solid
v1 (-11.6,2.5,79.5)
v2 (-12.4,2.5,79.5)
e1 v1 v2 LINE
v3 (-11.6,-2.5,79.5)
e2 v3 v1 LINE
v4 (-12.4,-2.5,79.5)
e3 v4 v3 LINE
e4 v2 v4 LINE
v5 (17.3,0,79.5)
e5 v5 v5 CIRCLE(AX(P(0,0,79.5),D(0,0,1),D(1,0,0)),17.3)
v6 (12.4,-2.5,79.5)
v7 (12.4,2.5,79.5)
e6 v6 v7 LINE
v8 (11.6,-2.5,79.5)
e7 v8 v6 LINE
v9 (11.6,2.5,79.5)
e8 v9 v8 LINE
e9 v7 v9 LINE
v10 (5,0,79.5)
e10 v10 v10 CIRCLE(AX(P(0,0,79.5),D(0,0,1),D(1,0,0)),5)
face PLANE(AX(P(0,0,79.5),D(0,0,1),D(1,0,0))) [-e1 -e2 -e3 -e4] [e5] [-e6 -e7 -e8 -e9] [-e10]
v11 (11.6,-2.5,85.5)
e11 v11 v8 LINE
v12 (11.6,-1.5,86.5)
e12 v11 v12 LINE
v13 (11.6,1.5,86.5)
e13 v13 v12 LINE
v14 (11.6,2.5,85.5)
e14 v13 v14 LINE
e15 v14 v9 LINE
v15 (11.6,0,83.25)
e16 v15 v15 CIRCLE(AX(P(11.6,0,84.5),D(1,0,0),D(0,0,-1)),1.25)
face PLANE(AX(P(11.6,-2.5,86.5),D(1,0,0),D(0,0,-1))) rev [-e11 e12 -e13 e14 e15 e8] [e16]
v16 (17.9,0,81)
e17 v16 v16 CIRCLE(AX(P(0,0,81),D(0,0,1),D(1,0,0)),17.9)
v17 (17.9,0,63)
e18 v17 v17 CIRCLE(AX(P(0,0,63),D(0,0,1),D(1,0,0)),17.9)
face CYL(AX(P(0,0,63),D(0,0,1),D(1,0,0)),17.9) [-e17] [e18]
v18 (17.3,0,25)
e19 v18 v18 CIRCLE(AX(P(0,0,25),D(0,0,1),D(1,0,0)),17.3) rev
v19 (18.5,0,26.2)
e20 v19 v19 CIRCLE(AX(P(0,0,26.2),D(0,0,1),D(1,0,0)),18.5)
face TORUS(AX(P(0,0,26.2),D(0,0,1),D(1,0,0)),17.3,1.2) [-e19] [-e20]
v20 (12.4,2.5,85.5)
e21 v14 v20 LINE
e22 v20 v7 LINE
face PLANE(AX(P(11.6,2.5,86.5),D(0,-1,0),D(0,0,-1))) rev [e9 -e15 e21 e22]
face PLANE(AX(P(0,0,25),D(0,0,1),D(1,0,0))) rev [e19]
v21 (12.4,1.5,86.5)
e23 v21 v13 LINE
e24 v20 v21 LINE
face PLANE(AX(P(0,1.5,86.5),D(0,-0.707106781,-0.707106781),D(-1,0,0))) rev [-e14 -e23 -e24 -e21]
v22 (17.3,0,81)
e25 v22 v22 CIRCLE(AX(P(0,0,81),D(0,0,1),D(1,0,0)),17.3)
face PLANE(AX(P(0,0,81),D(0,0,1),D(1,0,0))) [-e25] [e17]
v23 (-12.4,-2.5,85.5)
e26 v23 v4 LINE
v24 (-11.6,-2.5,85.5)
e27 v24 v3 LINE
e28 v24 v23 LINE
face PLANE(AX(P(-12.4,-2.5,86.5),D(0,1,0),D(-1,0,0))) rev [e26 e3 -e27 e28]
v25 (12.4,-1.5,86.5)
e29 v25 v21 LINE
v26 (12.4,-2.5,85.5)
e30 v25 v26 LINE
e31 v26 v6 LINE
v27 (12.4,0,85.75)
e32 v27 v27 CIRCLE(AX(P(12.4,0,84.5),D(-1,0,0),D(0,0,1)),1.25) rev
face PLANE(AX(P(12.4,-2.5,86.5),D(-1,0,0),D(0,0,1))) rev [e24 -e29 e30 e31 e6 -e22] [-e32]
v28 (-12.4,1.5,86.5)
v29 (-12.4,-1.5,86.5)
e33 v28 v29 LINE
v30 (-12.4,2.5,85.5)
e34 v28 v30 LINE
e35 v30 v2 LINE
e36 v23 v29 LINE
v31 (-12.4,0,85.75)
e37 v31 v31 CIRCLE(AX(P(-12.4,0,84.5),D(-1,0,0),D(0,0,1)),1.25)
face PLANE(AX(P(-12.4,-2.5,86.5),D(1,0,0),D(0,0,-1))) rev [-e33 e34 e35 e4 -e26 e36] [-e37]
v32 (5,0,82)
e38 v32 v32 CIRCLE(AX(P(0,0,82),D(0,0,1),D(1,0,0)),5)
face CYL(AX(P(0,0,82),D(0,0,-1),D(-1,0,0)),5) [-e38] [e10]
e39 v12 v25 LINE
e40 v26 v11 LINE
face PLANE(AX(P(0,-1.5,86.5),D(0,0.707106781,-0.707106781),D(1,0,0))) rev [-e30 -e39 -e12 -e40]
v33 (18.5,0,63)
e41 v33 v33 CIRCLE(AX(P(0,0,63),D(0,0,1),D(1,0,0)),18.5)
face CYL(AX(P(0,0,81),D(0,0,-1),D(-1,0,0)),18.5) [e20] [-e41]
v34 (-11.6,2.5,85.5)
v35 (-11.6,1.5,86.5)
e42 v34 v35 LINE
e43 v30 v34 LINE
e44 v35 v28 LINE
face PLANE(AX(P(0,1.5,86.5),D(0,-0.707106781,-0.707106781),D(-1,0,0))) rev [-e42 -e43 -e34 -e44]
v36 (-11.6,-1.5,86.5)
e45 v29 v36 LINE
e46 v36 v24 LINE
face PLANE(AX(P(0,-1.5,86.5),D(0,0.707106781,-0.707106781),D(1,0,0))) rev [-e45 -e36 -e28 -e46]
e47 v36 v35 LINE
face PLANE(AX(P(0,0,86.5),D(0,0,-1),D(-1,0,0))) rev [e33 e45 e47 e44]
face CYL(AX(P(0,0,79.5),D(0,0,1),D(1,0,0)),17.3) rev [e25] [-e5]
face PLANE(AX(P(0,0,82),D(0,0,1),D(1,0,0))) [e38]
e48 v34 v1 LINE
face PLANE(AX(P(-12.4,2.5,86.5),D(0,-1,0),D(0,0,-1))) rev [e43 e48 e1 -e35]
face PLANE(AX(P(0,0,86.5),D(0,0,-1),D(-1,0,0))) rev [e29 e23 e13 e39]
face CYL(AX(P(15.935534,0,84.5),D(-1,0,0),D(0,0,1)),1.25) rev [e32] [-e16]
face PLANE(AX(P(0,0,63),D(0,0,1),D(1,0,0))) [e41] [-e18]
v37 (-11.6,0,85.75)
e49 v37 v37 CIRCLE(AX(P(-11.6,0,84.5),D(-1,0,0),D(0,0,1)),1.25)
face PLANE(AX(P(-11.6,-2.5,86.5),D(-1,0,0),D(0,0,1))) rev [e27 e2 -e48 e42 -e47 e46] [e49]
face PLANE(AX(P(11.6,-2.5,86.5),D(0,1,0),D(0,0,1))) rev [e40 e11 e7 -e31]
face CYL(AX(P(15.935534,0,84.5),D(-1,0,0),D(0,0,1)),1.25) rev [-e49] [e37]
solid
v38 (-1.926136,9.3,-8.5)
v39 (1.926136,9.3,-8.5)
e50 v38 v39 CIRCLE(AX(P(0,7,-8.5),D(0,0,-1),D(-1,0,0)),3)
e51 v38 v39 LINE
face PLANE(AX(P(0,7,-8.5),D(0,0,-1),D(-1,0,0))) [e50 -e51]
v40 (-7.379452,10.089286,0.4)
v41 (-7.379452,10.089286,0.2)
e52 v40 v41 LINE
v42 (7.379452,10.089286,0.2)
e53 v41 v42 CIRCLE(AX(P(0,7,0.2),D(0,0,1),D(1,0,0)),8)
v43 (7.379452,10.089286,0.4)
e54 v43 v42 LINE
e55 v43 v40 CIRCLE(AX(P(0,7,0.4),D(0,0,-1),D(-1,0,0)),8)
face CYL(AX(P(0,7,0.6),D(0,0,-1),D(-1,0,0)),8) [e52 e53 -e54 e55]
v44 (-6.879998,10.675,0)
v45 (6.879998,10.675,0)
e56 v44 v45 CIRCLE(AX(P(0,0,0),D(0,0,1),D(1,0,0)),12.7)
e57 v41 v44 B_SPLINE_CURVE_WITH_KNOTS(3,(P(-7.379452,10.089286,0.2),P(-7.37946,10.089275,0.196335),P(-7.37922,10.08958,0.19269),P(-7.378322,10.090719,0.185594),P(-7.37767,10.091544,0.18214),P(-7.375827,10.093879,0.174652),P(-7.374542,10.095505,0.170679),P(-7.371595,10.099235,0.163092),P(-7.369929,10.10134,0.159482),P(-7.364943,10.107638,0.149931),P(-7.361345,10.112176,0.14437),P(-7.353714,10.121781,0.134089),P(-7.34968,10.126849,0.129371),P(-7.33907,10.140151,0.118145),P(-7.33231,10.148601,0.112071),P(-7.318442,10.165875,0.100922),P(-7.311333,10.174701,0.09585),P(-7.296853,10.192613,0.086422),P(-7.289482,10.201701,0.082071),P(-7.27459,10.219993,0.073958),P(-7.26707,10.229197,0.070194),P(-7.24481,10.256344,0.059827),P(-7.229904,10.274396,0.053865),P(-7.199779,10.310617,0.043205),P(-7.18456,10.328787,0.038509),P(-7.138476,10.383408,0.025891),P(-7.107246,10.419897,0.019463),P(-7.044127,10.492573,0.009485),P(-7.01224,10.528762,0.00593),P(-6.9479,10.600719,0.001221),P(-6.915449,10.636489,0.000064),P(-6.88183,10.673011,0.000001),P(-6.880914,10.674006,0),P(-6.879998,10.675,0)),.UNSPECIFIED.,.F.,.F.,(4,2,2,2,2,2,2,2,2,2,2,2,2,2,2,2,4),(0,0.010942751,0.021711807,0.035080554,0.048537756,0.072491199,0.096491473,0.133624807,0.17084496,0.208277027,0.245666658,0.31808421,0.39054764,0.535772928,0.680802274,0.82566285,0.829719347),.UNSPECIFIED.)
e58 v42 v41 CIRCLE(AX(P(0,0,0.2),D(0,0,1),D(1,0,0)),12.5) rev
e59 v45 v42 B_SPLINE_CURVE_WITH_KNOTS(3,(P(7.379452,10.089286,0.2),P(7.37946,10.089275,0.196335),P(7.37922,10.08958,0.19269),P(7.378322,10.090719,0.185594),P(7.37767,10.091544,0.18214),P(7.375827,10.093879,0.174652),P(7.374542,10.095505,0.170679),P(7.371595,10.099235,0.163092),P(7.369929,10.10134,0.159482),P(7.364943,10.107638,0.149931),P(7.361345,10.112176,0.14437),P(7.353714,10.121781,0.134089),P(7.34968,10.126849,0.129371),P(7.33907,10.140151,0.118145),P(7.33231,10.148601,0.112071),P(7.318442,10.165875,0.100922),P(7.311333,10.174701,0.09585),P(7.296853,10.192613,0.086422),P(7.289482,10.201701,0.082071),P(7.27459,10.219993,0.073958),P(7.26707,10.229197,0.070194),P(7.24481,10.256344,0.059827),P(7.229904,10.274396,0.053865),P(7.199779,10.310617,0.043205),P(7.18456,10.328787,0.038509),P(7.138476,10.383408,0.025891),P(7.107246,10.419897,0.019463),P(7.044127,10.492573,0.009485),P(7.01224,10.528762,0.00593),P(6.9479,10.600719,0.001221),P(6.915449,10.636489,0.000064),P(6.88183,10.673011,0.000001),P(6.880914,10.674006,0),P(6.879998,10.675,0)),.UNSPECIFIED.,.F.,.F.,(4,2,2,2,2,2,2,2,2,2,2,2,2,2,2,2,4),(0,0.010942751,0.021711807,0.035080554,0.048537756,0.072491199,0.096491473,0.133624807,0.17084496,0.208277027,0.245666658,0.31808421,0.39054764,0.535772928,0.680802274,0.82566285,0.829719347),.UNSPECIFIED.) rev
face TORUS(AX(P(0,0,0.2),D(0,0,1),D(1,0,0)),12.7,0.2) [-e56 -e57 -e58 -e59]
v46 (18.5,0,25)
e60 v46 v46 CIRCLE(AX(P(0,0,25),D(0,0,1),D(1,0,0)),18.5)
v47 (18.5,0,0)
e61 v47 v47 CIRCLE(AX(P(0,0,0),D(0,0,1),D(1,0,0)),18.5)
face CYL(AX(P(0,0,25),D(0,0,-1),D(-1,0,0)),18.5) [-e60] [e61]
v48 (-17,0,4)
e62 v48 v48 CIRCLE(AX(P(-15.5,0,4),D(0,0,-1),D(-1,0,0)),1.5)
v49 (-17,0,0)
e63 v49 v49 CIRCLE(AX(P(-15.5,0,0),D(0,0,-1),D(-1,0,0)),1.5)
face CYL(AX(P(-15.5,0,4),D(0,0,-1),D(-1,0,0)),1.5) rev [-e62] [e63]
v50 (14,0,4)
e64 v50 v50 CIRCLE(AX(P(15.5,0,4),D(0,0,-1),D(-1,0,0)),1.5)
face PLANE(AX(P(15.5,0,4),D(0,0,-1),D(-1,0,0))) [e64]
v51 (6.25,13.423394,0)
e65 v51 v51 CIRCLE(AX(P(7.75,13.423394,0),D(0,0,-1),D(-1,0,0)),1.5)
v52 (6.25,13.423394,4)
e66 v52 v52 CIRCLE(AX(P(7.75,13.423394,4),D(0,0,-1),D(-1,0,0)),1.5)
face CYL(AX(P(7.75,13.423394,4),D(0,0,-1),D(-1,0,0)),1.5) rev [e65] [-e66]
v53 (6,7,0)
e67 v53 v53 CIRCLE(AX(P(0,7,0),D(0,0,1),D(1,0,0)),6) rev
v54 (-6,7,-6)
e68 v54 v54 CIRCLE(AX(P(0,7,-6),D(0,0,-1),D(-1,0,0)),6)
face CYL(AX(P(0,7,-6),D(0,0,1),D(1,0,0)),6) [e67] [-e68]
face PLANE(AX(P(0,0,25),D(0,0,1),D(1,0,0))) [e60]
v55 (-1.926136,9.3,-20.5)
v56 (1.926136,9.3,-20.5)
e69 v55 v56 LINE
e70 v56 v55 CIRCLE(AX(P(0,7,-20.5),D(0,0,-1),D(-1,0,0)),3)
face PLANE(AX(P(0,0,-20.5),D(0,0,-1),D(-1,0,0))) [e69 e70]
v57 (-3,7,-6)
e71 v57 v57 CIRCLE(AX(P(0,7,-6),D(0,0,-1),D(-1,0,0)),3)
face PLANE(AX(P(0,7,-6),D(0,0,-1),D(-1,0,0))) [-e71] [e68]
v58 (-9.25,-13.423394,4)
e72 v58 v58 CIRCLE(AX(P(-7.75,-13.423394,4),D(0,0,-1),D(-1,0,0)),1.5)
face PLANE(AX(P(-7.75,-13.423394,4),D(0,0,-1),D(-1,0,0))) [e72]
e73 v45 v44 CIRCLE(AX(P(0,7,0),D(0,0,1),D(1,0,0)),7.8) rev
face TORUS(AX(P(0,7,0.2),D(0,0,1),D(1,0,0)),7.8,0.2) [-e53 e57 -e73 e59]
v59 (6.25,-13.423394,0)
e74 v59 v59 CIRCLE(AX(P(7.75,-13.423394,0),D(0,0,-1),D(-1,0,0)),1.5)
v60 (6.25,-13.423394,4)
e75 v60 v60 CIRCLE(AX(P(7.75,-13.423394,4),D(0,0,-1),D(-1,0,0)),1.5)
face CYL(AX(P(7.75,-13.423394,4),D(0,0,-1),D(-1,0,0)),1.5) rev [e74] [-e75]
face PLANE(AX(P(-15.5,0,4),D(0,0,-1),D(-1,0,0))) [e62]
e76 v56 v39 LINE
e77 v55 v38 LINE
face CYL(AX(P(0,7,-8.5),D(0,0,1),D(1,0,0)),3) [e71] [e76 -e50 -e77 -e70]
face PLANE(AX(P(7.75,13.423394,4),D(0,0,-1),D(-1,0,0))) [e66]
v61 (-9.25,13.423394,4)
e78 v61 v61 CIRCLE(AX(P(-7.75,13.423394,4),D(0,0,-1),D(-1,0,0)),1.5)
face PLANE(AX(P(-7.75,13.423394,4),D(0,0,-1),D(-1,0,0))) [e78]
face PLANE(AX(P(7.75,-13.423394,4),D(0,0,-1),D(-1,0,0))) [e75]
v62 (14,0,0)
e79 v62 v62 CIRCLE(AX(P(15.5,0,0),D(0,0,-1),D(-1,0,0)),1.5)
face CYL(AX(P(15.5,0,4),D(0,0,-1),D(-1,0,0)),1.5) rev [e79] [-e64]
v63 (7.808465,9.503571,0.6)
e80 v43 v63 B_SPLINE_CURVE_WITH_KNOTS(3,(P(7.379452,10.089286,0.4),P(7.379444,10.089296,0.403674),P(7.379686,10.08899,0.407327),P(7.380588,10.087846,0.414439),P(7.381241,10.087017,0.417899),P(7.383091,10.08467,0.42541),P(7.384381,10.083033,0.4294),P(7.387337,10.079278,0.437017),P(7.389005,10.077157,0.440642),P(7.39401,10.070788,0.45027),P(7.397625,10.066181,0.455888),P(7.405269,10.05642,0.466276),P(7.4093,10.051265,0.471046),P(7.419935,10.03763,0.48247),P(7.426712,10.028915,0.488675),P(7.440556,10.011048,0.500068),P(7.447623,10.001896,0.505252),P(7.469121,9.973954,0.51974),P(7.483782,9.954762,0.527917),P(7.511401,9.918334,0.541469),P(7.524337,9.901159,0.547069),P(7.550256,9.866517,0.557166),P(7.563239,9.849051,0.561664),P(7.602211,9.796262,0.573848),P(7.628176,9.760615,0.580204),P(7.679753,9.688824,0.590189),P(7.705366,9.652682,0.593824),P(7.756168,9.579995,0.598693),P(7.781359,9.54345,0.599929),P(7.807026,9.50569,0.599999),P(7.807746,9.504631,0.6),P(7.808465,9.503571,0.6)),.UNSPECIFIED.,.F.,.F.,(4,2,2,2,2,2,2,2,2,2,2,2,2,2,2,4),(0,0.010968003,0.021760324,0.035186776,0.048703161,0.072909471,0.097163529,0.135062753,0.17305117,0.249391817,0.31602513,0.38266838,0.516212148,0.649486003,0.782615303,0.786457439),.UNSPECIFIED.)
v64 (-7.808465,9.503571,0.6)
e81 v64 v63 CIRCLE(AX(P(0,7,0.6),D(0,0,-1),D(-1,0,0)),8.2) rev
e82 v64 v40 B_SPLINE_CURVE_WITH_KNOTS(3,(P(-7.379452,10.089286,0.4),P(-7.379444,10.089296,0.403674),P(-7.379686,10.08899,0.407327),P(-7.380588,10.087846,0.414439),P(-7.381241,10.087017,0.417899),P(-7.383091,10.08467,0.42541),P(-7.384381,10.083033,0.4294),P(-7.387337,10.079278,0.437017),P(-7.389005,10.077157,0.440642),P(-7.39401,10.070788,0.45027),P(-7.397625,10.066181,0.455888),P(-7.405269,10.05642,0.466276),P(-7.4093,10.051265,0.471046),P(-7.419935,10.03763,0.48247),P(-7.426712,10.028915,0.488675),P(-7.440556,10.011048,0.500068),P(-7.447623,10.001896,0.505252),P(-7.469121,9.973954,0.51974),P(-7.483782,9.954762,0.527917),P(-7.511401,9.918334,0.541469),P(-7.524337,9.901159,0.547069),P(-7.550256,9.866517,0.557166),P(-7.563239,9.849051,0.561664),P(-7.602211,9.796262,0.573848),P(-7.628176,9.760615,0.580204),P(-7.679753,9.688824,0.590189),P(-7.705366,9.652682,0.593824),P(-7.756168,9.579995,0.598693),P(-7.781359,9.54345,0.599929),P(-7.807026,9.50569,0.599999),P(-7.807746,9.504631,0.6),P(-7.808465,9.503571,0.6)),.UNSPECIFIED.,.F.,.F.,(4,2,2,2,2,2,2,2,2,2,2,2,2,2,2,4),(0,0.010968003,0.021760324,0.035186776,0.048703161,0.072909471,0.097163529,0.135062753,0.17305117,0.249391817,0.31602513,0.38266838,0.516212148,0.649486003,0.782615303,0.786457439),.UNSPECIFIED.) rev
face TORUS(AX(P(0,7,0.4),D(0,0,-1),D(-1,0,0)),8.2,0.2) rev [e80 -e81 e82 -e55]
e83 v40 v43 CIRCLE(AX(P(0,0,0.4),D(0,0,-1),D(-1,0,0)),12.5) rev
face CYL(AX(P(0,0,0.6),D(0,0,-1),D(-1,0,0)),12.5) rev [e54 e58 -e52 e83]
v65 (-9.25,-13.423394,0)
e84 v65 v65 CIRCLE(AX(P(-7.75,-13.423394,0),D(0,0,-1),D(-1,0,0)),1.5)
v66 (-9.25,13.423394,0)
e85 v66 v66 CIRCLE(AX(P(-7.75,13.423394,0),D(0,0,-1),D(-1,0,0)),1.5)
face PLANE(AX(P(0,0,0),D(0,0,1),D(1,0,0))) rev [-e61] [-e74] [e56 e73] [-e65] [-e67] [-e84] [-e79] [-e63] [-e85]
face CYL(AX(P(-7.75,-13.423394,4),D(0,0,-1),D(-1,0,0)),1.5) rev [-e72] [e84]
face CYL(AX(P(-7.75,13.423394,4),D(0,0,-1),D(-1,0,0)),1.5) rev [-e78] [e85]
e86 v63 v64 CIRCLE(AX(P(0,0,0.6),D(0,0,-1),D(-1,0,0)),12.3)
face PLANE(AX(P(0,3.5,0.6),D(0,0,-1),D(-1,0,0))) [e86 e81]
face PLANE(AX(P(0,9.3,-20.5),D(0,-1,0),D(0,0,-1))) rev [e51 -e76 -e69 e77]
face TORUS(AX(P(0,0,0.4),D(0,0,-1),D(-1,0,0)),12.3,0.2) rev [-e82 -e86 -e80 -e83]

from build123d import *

# Parameters (mm, degrees)
SKETCH1_R           = 18.5
BOSS_EXTRUDE1_DEPTH = 25
SKETCH2_R           = 18.5
BOSS_EXTRUDE2_DEPTH = 56
FILLET1_R           = 1.2
CUT_EXTRUDE2_START  = -18
SKETCH3_R           = 18.5
SKETCH3_R_2         = 17.9
CUT_EXTRUDE2_DEPTH  = 18
SKETCH4_R           = 17.3
CUT_EXTRUDE3_DEPTH  = 1.5
SKETCH5_R           = 5
BOSS_EXTRUDE3_DEPTH = 2.5
SKETCH6_W           = 0.8
SKETCH6_H           = 5
BOSS_EXTRUDE4_DEPTH = 7
CUT_EXTRUDE4_REACH  = 95.698
SKETCH7_R           = 1.25
CHAMFER1_SIZE       = 1
SKETCH8_R           = 6
BOSS_EXTRUDE5_DEPTH = 6
SKETCH9_R           = 3
BOSS_EXTRUDE6_DEPTH = 2.5
BOSS_EXTRUDE7_DEPTH = 12
CUT_EXTRUDE5_DEPTH  = 0.6
FILLET2_R           = 0.2
SKETCH12_R          = 1.5
CUT_EXTRUDE6_DEPTH  = 4


with BuildPart() as part:
    # Sketch1 → Boss-Extrude1 (new body)
    with BuildSketch(Plane.XY):
        Circle(SKETCH1_R)
    extrude(amount=BOSS_EXTRUDE1_DEPTH)

    # Sketch8 → Boss-Extrude5 (add)
    with BuildSketch(Plane(origin=(0, 0, 0), x_dir=(-1, 0, 0), z_dir=(0, 0, -1))):
        with Locations(Location((0, 7, 0), (0, 0, 180))):
            Circle(SKETCH8_R)
    extrude(amount=BOSS_EXTRUDE5_DEPTH)

    # Sketch9 → Boss-Extrude6 (add)
    with BuildSketch(Plane(origin=(0, 0, -6), x_dir=(-1, 0, 0), z_dir=(0, 0, -1))):
        with Locations((0, 7)):
            Circle(SKETCH9_R)
    extrude(amount=BOSS_EXTRUDE6_DEPTH)

    # Sketch10 → Boss-Extrude7 (add)
    with BuildSketch(Plane(origin=(0, 0, -8.5), x_dir=(-1, 0, 0), z_dir=(0, 0, -1))):
        with BuildLine():
            ThreePointArc((3, 7), (2.718309041, 8.269171366), (1.926136028, 9.3))
            Line((1.926136028, 9.3), (-1.926136028, 9.3))
            ThreePointArc((-1.926136028, 9.3), (-1.269171366, 4.281690959), (3, 7))
        make_face()
    extrude(amount=BOSS_EXTRUDE7_DEPTH)

    # Sketch11 → Cut-Extrude5 (cut)
    with BuildSketch(Plane(origin=(0, 0, 0), x_dir=(-1, 0, 0), z_dir=(0, 0, -1))):
        with BuildLine():
            ThreePointArc((-7.379452132, 10.089285714), (0, -12.5), (7.379452132, 10.089285714))
            ThreePointArc((7.379452132, 10.089285714), (0, -1), (-7.379452132, 10.089285714))
        make_face()
    extrude(amount=-CUT_EXTRUDE5_DEPTH, mode=Mode.SUBTRACT)

    # Fillet2
    fillet2_edges = [part.edges().sort_by_distance(p)[0] for p in [
        (0, -12.5, 0),
        (0, -1, 0),
        (0, -12.5, 0.6),
        (0, -1, 0.6),
    ]]
    fillet(fillet2_edges, radius=FILLET2_R)

    # Sketch12 → Cut-Extrude6 (cut)
    with BuildSketch(Plane(origin=(0, 0, 0), x_dir=(-1, 0, 0), z_dir=(0, 0, -1))):
        with Locations((-15.5, 0)):
            Circle(SKETCH12_R)
        with Locations((-7.75, 13.423393759)):
            Circle(SKETCH12_R)
        with Locations((7.75, 13.423393759)):
            Circle(SKETCH12_R)
        with Locations((15.5, 0)):
            Circle(SKETCH12_R)
        with Locations((7.75, -13.423393759)):
            Circle(SKETCH12_R)
        with Locations((-7.75, -13.423393759)):
            Circle(SKETCH12_R)
    extrude(amount=-CUT_EXTRUDE6_DEPTH, mode=Mode.SUBTRACT)


with BuildPart() as body_2:
    # Sketch2 → Boss-Extrude2 (new body)
    with BuildSketch(Plane.XY.offset(25)):
        Circle(SKETCH2_R)
    extrude(amount=BOSS_EXTRUDE2_DEPTH)

    # Fillet1
    fillet1_edges = [body_2.edges().sort_by_distance(p)[0] for p in [
        (-18.5, 0, 25),
    ]]
    fillet(fillet1_edges, radius=FILLET1_R)

    # Sketch3 → Cut-Extrude2 (cut)
    with BuildSketch(Plane.XY.offset(81).offset(CUT_EXTRUDE2_START)):
        Circle(SKETCH3_R)
        Circle(SKETCH3_R_2, mode=Mode.SUBTRACT)
    extrude(amount=CUT_EXTRUDE2_DEPTH, mode=Mode.SUBTRACT)

    # Sketch4 → Cut-Extrude3 (cut)
    with BuildSketch(Plane.XY.offset(81)):
        Circle(SKETCH4_R)
    extrude(amount=-CUT_EXTRUDE3_DEPTH, mode=Mode.SUBTRACT)

    # Sketch5 → Boss-Extrude3 (add)
    with BuildSketch(Plane.XY.offset(79.5)):
        Circle(SKETCH5_R)
    extrude(amount=BOSS_EXTRUDE3_DEPTH)

    # Sketch6 → Boss-Extrude4 (add)
    with BuildSketch(Plane.XY.offset(79.5)):
        with Locations((-12, 0)):
            Rectangle(SKETCH6_W, SKETCH6_H)
        with Locations((12, 0)):
            Rectangle(SKETCH6_W, SKETCH6_H)
    extrude(amount=BOSS_EXTRUDE4_DEPTH)

    # Cut-Extrude4: up to this face of the body (flat: up to its plane)
    cut_extrude4_end = Plane(body_2.part.faces().sort_by_distance((12.4, 0, 83))[0])
    # Sketch7 → Cut-Extrude4 (cut, up to the picked face)
    with BuildSketch(Plane.ZY.offset(12.4), mode=Mode.PRIVATE) as cut_extrude4_sk1:
        with Locations((84.5, 0)):
            Circle(SKETCH7_R)
    cut_extrude4_tool1 = split(extrude(cut_extrude4_sk1.sketch, amount=-CUT_EXTRUDE4_REACH, mode=Mode.PRIVATE), bisect_by=cut_extrude4_end, keep=Keep.BOTH, mode=Mode.PRIVATE)
    add(cut_extrude4_tool1.solids().sort_by(Axis((-12.4, 0, 84.5), (1, 0, 0)))[0], mode=Mode.SUBTRACT)

    # Chamfer1
    chamfer1_edges = [body_2.edges().sort_by_distance(p)[0] for p in [
        (-12, 2.5, 86.5),
        (-12, -2.5, 86.5),
        (12, 2.5, 86.5),
        (12, -2.5, 86.5),
    ]]
    chamfer(chamfer1_edges, length=CHAMFER1_SIZE)


solid = Compound([part.part, body_2.part])
